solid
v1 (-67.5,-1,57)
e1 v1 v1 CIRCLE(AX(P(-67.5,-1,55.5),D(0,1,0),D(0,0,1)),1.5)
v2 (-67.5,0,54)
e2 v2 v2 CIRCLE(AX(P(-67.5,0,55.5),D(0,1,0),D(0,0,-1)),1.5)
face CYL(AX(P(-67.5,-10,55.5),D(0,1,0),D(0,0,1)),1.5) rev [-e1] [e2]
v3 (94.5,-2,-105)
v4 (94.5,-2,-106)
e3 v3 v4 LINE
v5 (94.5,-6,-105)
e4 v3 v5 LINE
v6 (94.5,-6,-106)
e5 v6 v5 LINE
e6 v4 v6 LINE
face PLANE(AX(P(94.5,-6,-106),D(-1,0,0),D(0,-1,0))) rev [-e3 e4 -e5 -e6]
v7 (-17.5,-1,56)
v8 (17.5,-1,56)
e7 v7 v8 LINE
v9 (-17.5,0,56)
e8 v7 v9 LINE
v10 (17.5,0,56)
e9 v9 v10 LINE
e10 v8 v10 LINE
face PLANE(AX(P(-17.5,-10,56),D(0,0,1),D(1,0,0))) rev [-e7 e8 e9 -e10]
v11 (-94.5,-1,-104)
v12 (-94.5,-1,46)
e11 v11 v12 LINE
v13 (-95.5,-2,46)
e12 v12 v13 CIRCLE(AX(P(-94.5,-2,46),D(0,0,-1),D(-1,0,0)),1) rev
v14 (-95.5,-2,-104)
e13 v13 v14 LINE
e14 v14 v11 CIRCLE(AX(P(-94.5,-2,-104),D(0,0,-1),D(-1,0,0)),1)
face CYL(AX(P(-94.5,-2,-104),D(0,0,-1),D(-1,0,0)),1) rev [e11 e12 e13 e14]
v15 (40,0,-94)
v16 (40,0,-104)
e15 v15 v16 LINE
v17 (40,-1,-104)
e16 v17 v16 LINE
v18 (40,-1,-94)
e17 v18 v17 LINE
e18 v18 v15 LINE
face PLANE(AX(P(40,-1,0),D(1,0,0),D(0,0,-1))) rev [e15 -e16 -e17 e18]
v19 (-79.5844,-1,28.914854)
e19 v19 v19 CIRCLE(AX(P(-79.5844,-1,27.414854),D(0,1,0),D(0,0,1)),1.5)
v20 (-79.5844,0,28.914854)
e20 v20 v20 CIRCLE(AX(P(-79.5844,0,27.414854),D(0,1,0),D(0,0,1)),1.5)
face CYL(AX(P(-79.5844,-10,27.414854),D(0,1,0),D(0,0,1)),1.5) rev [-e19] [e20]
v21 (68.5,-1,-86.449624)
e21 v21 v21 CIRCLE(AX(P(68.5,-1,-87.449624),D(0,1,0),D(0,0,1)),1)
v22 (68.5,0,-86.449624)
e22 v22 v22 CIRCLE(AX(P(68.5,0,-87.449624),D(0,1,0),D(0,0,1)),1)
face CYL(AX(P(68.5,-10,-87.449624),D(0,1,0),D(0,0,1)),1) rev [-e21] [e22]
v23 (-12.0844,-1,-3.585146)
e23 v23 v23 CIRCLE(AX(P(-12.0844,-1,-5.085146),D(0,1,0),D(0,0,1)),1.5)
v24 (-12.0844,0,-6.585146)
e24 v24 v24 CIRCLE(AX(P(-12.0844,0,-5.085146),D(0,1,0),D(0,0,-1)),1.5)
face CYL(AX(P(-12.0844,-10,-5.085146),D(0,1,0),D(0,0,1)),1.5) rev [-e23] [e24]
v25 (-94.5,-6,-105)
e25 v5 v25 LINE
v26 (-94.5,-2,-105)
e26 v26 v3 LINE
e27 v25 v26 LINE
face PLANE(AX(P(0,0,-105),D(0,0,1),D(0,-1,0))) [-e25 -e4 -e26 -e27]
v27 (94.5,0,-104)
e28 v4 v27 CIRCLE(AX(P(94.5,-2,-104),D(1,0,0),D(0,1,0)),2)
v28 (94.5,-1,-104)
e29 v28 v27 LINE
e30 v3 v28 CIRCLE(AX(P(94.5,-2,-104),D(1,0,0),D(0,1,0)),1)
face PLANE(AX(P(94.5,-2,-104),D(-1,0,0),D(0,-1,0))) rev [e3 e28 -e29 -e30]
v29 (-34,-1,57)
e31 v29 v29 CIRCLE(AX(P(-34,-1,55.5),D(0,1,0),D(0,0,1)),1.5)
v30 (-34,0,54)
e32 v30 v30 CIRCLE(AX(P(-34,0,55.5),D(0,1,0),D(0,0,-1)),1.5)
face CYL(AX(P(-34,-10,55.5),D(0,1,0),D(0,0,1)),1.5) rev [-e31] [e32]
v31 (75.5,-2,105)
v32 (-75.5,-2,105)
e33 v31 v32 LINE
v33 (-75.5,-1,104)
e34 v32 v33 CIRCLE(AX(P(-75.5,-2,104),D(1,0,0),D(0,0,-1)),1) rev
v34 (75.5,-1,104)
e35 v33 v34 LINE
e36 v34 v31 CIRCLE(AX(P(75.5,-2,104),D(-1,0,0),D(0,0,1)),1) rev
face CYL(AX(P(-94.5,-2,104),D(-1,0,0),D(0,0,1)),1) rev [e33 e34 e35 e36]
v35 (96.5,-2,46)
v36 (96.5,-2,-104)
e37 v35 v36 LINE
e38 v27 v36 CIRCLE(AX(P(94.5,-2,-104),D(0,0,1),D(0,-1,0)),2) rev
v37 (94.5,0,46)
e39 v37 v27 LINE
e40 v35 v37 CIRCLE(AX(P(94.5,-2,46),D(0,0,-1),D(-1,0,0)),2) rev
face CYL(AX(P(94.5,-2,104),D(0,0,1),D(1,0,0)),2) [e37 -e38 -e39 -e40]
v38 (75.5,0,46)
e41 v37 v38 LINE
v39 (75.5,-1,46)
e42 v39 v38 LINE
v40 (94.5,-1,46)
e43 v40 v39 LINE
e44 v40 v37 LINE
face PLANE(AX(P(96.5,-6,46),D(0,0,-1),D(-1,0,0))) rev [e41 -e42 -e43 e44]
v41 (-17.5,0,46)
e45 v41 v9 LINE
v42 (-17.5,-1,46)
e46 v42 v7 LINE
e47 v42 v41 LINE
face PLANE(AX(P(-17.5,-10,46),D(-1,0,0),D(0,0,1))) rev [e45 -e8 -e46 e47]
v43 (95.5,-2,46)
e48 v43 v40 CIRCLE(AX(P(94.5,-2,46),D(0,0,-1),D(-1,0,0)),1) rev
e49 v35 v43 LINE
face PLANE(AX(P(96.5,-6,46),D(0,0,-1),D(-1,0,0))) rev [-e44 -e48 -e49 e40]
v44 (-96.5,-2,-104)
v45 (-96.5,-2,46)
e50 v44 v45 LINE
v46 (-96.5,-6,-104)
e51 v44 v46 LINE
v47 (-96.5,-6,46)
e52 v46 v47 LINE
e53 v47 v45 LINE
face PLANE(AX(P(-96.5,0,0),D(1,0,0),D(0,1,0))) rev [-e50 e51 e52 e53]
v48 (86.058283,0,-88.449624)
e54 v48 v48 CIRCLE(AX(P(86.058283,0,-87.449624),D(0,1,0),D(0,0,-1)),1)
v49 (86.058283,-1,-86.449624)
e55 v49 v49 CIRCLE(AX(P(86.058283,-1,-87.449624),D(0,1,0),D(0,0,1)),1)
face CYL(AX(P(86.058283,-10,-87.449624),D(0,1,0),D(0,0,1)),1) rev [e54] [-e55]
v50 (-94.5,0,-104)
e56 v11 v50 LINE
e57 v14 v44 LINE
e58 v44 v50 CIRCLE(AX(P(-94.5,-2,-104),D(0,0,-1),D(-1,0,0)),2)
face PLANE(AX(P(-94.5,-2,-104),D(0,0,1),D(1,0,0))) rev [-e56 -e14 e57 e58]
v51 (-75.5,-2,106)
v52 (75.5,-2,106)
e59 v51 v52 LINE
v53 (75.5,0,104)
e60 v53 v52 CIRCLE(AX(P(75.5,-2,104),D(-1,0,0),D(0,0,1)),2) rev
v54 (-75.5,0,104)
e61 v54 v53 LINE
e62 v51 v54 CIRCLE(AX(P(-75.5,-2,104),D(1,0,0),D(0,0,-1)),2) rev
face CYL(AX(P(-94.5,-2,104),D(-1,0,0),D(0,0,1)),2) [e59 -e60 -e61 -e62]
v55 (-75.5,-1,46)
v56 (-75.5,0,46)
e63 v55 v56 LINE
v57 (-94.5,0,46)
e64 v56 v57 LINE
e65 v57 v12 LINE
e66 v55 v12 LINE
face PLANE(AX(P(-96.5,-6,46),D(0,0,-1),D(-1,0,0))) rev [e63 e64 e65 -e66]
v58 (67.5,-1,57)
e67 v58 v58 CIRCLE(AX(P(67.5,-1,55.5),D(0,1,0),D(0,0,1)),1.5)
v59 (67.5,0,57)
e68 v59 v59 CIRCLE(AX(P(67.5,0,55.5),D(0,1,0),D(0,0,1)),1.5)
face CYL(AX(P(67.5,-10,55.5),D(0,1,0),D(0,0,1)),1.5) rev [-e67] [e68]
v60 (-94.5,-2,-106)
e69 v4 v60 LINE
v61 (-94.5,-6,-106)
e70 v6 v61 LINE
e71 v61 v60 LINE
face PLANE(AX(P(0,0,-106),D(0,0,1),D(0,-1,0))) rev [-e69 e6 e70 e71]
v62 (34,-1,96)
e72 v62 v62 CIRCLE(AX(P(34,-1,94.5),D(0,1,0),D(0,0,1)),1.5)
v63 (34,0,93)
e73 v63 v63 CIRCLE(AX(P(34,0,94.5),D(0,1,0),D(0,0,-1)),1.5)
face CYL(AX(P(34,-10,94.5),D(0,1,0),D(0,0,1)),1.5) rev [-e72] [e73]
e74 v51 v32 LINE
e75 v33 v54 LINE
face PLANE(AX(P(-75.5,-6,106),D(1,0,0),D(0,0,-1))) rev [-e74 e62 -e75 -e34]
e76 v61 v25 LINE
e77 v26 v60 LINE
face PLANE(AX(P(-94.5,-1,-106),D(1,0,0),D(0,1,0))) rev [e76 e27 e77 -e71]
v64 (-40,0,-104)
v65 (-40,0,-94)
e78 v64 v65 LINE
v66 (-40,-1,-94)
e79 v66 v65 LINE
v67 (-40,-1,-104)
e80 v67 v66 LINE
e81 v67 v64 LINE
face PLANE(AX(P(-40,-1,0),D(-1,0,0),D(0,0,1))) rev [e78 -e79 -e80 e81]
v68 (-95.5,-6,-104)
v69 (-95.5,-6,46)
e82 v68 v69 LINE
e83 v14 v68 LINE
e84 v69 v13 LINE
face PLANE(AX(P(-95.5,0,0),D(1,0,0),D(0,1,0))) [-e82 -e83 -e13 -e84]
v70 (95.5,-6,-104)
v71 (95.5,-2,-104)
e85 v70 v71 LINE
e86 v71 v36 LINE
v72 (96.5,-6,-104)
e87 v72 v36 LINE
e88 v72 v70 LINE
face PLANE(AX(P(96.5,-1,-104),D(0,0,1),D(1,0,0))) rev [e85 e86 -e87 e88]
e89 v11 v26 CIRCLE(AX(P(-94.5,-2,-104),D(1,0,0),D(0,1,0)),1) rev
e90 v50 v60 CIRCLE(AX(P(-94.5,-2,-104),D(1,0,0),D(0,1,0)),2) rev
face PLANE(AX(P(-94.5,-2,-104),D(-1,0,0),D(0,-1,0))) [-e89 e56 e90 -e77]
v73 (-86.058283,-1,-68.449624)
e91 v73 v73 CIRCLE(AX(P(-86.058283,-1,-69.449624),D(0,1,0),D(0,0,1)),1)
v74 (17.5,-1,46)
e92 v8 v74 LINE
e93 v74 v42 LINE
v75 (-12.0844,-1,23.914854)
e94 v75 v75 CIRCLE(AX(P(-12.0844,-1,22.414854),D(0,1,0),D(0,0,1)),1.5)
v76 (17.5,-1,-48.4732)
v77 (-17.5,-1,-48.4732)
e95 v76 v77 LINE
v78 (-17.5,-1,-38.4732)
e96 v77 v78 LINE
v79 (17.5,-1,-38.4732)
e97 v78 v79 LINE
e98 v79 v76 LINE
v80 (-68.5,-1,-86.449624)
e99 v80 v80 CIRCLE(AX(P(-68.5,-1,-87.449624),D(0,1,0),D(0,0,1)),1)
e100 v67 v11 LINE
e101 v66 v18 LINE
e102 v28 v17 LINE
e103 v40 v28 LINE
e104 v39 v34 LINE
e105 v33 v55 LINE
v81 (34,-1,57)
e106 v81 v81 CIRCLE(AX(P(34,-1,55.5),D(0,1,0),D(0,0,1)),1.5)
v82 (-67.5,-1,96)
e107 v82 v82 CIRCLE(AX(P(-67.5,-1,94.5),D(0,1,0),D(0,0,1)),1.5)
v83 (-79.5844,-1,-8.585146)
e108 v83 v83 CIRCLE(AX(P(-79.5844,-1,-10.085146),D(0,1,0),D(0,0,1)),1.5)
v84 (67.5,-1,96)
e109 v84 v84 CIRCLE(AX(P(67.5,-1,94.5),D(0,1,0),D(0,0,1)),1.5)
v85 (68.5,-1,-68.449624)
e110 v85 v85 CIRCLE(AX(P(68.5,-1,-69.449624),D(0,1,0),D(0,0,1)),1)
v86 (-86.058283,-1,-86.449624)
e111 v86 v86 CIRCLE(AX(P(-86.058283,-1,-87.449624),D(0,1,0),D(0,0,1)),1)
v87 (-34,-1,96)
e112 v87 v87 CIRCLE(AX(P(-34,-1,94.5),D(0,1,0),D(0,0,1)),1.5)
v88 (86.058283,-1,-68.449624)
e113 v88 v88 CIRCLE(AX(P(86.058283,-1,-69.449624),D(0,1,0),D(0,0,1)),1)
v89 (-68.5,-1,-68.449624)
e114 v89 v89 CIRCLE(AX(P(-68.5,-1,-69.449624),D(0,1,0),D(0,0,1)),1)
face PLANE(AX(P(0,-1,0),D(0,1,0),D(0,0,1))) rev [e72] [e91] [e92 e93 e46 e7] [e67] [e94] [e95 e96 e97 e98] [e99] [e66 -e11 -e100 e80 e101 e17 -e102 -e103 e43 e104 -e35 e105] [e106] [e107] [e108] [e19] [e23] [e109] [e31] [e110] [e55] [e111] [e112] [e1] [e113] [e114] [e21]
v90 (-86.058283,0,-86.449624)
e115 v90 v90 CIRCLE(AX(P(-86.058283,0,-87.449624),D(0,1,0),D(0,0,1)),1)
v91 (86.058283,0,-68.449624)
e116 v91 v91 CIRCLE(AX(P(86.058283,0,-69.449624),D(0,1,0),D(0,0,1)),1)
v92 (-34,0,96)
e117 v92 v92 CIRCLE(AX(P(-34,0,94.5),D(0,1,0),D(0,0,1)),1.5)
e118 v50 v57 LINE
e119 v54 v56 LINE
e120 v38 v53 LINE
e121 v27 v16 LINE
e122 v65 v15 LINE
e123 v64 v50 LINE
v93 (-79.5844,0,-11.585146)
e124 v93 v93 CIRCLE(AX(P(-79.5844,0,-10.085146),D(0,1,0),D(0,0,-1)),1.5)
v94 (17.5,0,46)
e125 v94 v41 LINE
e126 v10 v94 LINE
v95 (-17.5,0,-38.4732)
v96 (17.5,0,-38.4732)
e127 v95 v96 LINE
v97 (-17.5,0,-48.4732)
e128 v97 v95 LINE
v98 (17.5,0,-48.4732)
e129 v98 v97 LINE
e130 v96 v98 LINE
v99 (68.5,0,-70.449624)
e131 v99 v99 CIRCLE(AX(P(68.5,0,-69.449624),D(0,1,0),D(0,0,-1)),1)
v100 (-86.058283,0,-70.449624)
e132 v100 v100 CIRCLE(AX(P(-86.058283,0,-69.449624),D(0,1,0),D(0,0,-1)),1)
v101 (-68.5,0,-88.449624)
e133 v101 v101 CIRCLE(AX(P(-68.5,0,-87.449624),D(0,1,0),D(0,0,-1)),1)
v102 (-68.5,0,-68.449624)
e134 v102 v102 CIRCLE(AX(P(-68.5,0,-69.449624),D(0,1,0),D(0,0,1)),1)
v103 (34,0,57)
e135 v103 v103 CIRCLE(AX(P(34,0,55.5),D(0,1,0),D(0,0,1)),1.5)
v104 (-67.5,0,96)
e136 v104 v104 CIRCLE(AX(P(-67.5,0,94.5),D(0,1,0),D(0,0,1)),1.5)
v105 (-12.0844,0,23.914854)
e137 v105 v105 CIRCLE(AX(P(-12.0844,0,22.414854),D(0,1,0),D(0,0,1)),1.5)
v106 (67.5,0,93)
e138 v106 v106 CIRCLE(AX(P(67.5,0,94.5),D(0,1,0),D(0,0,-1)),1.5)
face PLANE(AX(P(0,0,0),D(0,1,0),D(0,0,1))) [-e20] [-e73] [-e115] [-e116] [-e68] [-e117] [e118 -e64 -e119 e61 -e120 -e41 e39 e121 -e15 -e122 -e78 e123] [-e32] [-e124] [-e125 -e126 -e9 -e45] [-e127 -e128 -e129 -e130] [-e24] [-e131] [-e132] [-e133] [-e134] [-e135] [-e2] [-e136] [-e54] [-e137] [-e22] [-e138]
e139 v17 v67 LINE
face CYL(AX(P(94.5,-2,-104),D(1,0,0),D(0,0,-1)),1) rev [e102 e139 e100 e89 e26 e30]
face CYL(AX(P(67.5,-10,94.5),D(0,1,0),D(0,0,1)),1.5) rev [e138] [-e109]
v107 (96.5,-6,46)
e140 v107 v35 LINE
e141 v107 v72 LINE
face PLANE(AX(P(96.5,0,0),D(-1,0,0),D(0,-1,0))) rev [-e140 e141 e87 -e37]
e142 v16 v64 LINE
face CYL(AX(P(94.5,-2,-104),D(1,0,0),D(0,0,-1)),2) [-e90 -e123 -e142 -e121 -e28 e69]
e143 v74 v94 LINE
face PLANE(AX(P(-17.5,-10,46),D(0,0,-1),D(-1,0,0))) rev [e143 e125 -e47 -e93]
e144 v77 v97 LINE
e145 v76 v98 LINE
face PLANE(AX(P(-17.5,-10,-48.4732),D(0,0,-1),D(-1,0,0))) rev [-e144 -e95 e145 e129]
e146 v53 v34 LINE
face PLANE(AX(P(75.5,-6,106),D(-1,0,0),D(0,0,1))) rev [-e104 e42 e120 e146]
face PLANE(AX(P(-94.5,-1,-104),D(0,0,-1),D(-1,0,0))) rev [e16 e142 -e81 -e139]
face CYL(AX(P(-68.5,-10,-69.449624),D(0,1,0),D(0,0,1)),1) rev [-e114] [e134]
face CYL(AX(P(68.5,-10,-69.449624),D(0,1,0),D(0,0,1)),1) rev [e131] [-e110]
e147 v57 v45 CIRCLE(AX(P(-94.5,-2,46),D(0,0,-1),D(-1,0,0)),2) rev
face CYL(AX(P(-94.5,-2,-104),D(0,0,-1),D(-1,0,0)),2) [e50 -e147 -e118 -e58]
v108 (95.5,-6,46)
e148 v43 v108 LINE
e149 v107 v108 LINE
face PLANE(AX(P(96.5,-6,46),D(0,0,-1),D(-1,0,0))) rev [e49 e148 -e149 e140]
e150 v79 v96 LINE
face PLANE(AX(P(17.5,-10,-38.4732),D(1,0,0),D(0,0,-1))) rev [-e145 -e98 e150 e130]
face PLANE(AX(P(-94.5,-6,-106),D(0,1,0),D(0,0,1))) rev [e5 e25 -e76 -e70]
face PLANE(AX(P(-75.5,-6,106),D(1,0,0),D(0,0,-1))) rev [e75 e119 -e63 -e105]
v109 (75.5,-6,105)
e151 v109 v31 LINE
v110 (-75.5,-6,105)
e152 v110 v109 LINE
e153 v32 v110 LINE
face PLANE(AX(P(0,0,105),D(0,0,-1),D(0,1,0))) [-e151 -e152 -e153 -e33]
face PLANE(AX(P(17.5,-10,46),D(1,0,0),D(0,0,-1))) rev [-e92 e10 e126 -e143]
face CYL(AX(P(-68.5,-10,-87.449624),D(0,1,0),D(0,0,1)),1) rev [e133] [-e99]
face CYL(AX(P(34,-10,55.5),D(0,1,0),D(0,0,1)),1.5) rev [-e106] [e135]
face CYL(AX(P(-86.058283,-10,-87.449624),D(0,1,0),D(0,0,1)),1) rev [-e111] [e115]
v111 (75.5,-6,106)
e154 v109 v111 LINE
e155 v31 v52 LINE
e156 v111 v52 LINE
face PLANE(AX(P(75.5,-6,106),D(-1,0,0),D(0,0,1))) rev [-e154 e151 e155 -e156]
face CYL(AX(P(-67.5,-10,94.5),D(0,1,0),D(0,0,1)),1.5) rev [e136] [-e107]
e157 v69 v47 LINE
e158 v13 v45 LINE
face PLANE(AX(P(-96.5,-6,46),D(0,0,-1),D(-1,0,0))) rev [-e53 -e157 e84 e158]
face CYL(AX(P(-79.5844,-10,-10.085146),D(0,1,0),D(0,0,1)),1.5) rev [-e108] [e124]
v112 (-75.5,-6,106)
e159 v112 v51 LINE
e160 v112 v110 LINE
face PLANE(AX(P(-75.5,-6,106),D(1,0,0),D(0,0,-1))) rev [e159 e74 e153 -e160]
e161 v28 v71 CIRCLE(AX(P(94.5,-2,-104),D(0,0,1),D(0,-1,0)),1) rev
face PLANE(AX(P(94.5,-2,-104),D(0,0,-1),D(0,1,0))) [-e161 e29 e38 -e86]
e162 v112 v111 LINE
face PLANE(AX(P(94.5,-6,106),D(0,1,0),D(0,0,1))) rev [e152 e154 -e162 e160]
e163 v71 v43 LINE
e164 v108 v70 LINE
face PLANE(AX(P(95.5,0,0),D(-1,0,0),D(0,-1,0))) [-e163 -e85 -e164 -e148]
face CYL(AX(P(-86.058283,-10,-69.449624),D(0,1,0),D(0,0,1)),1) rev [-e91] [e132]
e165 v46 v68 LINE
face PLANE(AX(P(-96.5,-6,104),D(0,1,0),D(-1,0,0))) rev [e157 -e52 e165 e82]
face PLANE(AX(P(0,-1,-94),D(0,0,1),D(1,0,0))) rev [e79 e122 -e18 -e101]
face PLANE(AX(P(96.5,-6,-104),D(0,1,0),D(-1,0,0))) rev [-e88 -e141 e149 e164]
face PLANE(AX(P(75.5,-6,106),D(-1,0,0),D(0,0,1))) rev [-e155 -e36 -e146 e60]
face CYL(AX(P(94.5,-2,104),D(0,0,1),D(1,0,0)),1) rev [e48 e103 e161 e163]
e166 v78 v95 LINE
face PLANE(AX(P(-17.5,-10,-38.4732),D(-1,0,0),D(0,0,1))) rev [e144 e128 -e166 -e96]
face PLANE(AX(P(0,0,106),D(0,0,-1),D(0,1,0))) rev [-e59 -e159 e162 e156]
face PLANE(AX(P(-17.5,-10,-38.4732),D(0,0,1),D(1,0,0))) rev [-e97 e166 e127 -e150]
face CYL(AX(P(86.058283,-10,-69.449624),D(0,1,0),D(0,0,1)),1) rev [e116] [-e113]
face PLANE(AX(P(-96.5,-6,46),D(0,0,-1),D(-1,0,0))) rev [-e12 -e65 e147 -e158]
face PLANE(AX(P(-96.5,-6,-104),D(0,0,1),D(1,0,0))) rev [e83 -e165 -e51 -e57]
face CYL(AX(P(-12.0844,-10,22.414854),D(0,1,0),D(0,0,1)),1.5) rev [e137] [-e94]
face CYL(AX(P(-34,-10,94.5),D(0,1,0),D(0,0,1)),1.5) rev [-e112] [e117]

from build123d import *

# Parameters (mm, degrees)
SKETCH1_W          = 189
SKETCH1_H          = 208
BASE_FLANGE1_DEPTH = 1
EDGE_FLANGE1_DEPTH = 189
EDGE_FLANGE2_DEPTH = 208
EDGE_FLANGE3_DEPTH = 189
EDGE_FLANGE4_DEPTH = 208
SKETCH17_W         = 21
SKETCH17_H         = 60
CUT_EXTRUDE1_DEPTH = 144.472122728
SKETCH18_W         = 80
SKETCH18_H         = 10
CUT_EXTRUDE2_DEPTH = 10
SKETCH20_R         = 1.5
CUT_EXTRUDE3_DEPTH = 10
SKETCH21_R         = 1
CUT_EXTRUDE4_DEPTH = 10
SKETCH22_R         = 1.5
CUT_EXTRUDE5_DEPTH = 10
SKETCH23_W         = 35
SKETCH23_H         = 10
CUT_EXTRUDE6_DEPTH = 10


# Sheet-metal steps are written as plain solids
with BuildPart() as part:
    # Sketch1 → Base-Flange1 (new body)
    with BuildSketch(Plane(origin=(0, 0, 0), x_dir=(1, 0, 0), z_dir=(0, 1, 0))):
        Rectangle(SKETCH1_W, SKETCH1_H)
    extrude(amount=-BASE_FLANGE1_DEPTH)

    # Edge-Flange1 section (across the edge) → Edge-Flange1 (add)
    with BuildSketch(Plane(origin=(94.5, -1, 105), x_dir=(0, 0, -1), z_dir=(-1, 0, 0))):
        with BuildLine():
            Line((-1, 1), (-1, 5))
            Line((-1, 5), (0, 5))
            Line((0, 5), (0, 1))
            ThreePointArc((0, 1), (0.292893219, 0.292893219), (1, 0))
            Line((1, 0), (1, -1))
            ThreePointArc((1, -1), (-0.414213562, -0.414213562), (-1, 1))
        make_face()
    extrude(amount=EDGE_FLANGE1_DEPTH)

    # Edge-Flange2 section (across the edge) → Edge-Flange2 (add)
    with BuildSketch(Plane(origin=(95.5, -1, -104), x_dir=(-1, 0, 0), z_dir=(0, 0, 1))):
        with BuildLine():
            Line((-1, 1), (-1, 5))
            Line((-1, 5), (0, 5))
            Line((0, 5), (0, 1))
            ThreePointArc((0, 1), (0.292893219, 0.292893219), (1, 0))
            Line((1, 0), (1, -1))
            ThreePointArc((1, -1), (-0.414213562, -0.414213562), (-1, 1))
        make_face()
    extrude(amount=EDGE_FLANGE2_DEPTH)

    # Edge-Flange3 section (across the edge) → Edge-Flange3 (add)
    with BuildSketch(Plane(origin=(-94.5, -1, -105), x_dir=(0, 0, 1), z_dir=(1, 0, 0))):
        with BuildLine():
            Line((-1, 1), (-1, 5))
            Line((-1, 5), (0, 5))
            Line((0, 5), (0, 1))
            ThreePointArc((0, 1), (0.292893219, 0.292893219), (1, 0))
            Line((1, 0), (1, -1))
            ThreePointArc((1, -1), (-0.414213562, -0.414213562), (-1, 1))
        make_face()
    extrude(amount=EDGE_FLANGE3_DEPTH)

    # Edge-Flange4 section (across the edge) → Edge-Flange4 (add)
    with BuildSketch(Plane(origin=(-95.5, -1, 104), x_dir=(1, 0, 0), z_dir=(0, 0, -1))):
        with BuildLine():
            Line((-1, 1), (-1, 5))
            Line((-1, 5), (0, 5))
            Line((0, 5), (0, 1))
            ThreePointArc((0, 1), (0.292893219, 0.292893219), (1, 0))
            Line((1, 0), (1, -1))
            ThreePointArc((1, -1), (-0.414213562, -0.414213562), (-1, 1))
        make_face()
    extrude(amount=EDGE_FLANGE4_DEPTH)

    # Sketch17 → Cut-Extrude1 (cut, through all)
    with BuildSketch(Plane(origin=(0, 0, 0), x_dir=(1, 0, 0), z_dir=(0, 1, 0))):
        with Locations((86, -76)):
            Rectangle(SKETCH17_W, SKETCH17_H)
        with Locations((-86, -76)):
            Rectangle(SKETCH17_W, SKETCH17_H)
    extrude(amount=-CUT_EXTRUDE1_DEPTH, mode=Mode.SUBTRACT)

    # Sketch18 → Cut-Extrude2 (cut)
    with BuildSketch(Plane(origin=(0, 0, 0), x_dir=(1, 0, 0), z_dir=(0, 1, 0))):
        with Locations((0, 99)):
            Rectangle(SKETCH18_W, SKETCH18_H)
    extrude(amount=-CUT_EXTRUDE2_DEPTH, mode=Mode.SUBTRACT)

    # Sketch20 → Cut-Extrude3 (cut)
    with BuildSketch(Plane(origin=(0, 0, 0), x_dir=(1, 0, 0), z_dir=(0, 1, 0))):
        with Locations(Location((-79.5844, -27.41485418, 0), (0, 0, 270))):
            Circle(SKETCH20_R)
        with Locations(Location((-12.0844, -22.41485418, 0), (0, 0, 270))):
            Circle(SKETCH20_R)
        with Locations(Location((-12.0844, 5.08514582, 0), (0, 0, 270))):
            Circle(SKETCH20_R)
        with Locations(Location((-79.5844, 10.08514582, 0), (0, 0, 270))):
            Circle(SKETCH20_R)
    extrude(amount=-CUT_EXTRUDE3_DEPTH, mode=Mode.SUBTRACT)

    # Sketch21 → Cut-Extrude4 (cut)
    with BuildSketch(Plane(origin=(0, 0, 0), x_dir=(1, 0, 0), z_dir=(0, 1, 0))):
        with Locations(Location((68.5, 87.449623923, 0), (0, 0, 270))):
            Circle(SKETCH21_R)
        with Locations(Location((86.058283099, 87.449623923, 0), (0, 0, 270))):
            Circle(SKETCH21_R)
        with Locations(Location((68.5, 69.449623923, 0), (0, 0, 270))):
            Circle(SKETCH21_R)
        with Locations(Location((86.058283099, 69.449623923, 0), (0, 0, 270))):
            Circle(SKETCH21_R)
        with Locations(Location((-86.058283099, 87.449623923, 0), (0, 0, 270))):
            Circle(SKETCH21_R)
        with Locations(Location((-86.058283099, 69.449623923, 0), (0, 0, 270))):
            Circle(SKETCH21_R)
        with Locations(Location((-68.5, 69.449623923, 0), (0, 0, 270))):
            Circle(SKETCH21_R)
        with Locations(Location((-68.5, 87.449623923, 0), (0, 0, 270))):
            Circle(SKETCH21_R)
    extrude(amount=-CUT_EXTRUDE4_DEPTH, mode=Mode.SUBTRACT)

    # Sketch22 → Cut-Extrude5 (cut)
    with BuildSketch(Plane(origin=(0, 0, 0), x_dir=(1, 0, 0), z_dir=(0, 1, 0))):
        with Locations(Location((67.5, -55.5, 0), (0, 0, 270))):
            Circle(SKETCH22_R)
        with Locations(Location((34, -55.5, 0), (0, 0, 270))):
            Circle(SKETCH22_R)
        with Locations(Location((34, -94.5, 0), (0, 0, 270))):
            Circle(SKETCH22_R)
        with Locations(Location((67.5, -94.5, 0), (0, 0, 270))):
            Circle(SKETCH22_R)
        with Locations(Location((-67.5, -94.5, 0), (0, 0, 270))):
            Circle(SKETCH22_R)
        with Locations(Location((-34, -94.5, 0), (0, 0, 270))):
            Circle(SKETCH22_R)
        with Locations(Location((-34, -55.5, 0), (0, 0, 270))):
            Circle(SKETCH22_R)
        with Locations(Location((-67.5, -55.5, 0), (0, 0, 270))):
            Circle(SKETCH22_R)
    extrude(amount=-CUT_EXTRUDE5_DEPTH, mode=Mode.SUBTRACT)

    # Sketch23 → Cut-Extrude6 (cut)
    with BuildSketch(Plane(origin=(0, 0, 0), x_dir=(1, 0, 0), z_dir=(0, 1, 0))):
        with Locations((0, 43.4732)):
            Rectangle(SKETCH23_W, SKETCH23_H)
        with Locations((0, -51)):
            Rectangle(SKETCH23_W, SKETCH23_H)
    extrude(amount=-CUT_EXTRUDE6_DEPTH, mode=Mode.SUBTRACT)


solid = part.part
